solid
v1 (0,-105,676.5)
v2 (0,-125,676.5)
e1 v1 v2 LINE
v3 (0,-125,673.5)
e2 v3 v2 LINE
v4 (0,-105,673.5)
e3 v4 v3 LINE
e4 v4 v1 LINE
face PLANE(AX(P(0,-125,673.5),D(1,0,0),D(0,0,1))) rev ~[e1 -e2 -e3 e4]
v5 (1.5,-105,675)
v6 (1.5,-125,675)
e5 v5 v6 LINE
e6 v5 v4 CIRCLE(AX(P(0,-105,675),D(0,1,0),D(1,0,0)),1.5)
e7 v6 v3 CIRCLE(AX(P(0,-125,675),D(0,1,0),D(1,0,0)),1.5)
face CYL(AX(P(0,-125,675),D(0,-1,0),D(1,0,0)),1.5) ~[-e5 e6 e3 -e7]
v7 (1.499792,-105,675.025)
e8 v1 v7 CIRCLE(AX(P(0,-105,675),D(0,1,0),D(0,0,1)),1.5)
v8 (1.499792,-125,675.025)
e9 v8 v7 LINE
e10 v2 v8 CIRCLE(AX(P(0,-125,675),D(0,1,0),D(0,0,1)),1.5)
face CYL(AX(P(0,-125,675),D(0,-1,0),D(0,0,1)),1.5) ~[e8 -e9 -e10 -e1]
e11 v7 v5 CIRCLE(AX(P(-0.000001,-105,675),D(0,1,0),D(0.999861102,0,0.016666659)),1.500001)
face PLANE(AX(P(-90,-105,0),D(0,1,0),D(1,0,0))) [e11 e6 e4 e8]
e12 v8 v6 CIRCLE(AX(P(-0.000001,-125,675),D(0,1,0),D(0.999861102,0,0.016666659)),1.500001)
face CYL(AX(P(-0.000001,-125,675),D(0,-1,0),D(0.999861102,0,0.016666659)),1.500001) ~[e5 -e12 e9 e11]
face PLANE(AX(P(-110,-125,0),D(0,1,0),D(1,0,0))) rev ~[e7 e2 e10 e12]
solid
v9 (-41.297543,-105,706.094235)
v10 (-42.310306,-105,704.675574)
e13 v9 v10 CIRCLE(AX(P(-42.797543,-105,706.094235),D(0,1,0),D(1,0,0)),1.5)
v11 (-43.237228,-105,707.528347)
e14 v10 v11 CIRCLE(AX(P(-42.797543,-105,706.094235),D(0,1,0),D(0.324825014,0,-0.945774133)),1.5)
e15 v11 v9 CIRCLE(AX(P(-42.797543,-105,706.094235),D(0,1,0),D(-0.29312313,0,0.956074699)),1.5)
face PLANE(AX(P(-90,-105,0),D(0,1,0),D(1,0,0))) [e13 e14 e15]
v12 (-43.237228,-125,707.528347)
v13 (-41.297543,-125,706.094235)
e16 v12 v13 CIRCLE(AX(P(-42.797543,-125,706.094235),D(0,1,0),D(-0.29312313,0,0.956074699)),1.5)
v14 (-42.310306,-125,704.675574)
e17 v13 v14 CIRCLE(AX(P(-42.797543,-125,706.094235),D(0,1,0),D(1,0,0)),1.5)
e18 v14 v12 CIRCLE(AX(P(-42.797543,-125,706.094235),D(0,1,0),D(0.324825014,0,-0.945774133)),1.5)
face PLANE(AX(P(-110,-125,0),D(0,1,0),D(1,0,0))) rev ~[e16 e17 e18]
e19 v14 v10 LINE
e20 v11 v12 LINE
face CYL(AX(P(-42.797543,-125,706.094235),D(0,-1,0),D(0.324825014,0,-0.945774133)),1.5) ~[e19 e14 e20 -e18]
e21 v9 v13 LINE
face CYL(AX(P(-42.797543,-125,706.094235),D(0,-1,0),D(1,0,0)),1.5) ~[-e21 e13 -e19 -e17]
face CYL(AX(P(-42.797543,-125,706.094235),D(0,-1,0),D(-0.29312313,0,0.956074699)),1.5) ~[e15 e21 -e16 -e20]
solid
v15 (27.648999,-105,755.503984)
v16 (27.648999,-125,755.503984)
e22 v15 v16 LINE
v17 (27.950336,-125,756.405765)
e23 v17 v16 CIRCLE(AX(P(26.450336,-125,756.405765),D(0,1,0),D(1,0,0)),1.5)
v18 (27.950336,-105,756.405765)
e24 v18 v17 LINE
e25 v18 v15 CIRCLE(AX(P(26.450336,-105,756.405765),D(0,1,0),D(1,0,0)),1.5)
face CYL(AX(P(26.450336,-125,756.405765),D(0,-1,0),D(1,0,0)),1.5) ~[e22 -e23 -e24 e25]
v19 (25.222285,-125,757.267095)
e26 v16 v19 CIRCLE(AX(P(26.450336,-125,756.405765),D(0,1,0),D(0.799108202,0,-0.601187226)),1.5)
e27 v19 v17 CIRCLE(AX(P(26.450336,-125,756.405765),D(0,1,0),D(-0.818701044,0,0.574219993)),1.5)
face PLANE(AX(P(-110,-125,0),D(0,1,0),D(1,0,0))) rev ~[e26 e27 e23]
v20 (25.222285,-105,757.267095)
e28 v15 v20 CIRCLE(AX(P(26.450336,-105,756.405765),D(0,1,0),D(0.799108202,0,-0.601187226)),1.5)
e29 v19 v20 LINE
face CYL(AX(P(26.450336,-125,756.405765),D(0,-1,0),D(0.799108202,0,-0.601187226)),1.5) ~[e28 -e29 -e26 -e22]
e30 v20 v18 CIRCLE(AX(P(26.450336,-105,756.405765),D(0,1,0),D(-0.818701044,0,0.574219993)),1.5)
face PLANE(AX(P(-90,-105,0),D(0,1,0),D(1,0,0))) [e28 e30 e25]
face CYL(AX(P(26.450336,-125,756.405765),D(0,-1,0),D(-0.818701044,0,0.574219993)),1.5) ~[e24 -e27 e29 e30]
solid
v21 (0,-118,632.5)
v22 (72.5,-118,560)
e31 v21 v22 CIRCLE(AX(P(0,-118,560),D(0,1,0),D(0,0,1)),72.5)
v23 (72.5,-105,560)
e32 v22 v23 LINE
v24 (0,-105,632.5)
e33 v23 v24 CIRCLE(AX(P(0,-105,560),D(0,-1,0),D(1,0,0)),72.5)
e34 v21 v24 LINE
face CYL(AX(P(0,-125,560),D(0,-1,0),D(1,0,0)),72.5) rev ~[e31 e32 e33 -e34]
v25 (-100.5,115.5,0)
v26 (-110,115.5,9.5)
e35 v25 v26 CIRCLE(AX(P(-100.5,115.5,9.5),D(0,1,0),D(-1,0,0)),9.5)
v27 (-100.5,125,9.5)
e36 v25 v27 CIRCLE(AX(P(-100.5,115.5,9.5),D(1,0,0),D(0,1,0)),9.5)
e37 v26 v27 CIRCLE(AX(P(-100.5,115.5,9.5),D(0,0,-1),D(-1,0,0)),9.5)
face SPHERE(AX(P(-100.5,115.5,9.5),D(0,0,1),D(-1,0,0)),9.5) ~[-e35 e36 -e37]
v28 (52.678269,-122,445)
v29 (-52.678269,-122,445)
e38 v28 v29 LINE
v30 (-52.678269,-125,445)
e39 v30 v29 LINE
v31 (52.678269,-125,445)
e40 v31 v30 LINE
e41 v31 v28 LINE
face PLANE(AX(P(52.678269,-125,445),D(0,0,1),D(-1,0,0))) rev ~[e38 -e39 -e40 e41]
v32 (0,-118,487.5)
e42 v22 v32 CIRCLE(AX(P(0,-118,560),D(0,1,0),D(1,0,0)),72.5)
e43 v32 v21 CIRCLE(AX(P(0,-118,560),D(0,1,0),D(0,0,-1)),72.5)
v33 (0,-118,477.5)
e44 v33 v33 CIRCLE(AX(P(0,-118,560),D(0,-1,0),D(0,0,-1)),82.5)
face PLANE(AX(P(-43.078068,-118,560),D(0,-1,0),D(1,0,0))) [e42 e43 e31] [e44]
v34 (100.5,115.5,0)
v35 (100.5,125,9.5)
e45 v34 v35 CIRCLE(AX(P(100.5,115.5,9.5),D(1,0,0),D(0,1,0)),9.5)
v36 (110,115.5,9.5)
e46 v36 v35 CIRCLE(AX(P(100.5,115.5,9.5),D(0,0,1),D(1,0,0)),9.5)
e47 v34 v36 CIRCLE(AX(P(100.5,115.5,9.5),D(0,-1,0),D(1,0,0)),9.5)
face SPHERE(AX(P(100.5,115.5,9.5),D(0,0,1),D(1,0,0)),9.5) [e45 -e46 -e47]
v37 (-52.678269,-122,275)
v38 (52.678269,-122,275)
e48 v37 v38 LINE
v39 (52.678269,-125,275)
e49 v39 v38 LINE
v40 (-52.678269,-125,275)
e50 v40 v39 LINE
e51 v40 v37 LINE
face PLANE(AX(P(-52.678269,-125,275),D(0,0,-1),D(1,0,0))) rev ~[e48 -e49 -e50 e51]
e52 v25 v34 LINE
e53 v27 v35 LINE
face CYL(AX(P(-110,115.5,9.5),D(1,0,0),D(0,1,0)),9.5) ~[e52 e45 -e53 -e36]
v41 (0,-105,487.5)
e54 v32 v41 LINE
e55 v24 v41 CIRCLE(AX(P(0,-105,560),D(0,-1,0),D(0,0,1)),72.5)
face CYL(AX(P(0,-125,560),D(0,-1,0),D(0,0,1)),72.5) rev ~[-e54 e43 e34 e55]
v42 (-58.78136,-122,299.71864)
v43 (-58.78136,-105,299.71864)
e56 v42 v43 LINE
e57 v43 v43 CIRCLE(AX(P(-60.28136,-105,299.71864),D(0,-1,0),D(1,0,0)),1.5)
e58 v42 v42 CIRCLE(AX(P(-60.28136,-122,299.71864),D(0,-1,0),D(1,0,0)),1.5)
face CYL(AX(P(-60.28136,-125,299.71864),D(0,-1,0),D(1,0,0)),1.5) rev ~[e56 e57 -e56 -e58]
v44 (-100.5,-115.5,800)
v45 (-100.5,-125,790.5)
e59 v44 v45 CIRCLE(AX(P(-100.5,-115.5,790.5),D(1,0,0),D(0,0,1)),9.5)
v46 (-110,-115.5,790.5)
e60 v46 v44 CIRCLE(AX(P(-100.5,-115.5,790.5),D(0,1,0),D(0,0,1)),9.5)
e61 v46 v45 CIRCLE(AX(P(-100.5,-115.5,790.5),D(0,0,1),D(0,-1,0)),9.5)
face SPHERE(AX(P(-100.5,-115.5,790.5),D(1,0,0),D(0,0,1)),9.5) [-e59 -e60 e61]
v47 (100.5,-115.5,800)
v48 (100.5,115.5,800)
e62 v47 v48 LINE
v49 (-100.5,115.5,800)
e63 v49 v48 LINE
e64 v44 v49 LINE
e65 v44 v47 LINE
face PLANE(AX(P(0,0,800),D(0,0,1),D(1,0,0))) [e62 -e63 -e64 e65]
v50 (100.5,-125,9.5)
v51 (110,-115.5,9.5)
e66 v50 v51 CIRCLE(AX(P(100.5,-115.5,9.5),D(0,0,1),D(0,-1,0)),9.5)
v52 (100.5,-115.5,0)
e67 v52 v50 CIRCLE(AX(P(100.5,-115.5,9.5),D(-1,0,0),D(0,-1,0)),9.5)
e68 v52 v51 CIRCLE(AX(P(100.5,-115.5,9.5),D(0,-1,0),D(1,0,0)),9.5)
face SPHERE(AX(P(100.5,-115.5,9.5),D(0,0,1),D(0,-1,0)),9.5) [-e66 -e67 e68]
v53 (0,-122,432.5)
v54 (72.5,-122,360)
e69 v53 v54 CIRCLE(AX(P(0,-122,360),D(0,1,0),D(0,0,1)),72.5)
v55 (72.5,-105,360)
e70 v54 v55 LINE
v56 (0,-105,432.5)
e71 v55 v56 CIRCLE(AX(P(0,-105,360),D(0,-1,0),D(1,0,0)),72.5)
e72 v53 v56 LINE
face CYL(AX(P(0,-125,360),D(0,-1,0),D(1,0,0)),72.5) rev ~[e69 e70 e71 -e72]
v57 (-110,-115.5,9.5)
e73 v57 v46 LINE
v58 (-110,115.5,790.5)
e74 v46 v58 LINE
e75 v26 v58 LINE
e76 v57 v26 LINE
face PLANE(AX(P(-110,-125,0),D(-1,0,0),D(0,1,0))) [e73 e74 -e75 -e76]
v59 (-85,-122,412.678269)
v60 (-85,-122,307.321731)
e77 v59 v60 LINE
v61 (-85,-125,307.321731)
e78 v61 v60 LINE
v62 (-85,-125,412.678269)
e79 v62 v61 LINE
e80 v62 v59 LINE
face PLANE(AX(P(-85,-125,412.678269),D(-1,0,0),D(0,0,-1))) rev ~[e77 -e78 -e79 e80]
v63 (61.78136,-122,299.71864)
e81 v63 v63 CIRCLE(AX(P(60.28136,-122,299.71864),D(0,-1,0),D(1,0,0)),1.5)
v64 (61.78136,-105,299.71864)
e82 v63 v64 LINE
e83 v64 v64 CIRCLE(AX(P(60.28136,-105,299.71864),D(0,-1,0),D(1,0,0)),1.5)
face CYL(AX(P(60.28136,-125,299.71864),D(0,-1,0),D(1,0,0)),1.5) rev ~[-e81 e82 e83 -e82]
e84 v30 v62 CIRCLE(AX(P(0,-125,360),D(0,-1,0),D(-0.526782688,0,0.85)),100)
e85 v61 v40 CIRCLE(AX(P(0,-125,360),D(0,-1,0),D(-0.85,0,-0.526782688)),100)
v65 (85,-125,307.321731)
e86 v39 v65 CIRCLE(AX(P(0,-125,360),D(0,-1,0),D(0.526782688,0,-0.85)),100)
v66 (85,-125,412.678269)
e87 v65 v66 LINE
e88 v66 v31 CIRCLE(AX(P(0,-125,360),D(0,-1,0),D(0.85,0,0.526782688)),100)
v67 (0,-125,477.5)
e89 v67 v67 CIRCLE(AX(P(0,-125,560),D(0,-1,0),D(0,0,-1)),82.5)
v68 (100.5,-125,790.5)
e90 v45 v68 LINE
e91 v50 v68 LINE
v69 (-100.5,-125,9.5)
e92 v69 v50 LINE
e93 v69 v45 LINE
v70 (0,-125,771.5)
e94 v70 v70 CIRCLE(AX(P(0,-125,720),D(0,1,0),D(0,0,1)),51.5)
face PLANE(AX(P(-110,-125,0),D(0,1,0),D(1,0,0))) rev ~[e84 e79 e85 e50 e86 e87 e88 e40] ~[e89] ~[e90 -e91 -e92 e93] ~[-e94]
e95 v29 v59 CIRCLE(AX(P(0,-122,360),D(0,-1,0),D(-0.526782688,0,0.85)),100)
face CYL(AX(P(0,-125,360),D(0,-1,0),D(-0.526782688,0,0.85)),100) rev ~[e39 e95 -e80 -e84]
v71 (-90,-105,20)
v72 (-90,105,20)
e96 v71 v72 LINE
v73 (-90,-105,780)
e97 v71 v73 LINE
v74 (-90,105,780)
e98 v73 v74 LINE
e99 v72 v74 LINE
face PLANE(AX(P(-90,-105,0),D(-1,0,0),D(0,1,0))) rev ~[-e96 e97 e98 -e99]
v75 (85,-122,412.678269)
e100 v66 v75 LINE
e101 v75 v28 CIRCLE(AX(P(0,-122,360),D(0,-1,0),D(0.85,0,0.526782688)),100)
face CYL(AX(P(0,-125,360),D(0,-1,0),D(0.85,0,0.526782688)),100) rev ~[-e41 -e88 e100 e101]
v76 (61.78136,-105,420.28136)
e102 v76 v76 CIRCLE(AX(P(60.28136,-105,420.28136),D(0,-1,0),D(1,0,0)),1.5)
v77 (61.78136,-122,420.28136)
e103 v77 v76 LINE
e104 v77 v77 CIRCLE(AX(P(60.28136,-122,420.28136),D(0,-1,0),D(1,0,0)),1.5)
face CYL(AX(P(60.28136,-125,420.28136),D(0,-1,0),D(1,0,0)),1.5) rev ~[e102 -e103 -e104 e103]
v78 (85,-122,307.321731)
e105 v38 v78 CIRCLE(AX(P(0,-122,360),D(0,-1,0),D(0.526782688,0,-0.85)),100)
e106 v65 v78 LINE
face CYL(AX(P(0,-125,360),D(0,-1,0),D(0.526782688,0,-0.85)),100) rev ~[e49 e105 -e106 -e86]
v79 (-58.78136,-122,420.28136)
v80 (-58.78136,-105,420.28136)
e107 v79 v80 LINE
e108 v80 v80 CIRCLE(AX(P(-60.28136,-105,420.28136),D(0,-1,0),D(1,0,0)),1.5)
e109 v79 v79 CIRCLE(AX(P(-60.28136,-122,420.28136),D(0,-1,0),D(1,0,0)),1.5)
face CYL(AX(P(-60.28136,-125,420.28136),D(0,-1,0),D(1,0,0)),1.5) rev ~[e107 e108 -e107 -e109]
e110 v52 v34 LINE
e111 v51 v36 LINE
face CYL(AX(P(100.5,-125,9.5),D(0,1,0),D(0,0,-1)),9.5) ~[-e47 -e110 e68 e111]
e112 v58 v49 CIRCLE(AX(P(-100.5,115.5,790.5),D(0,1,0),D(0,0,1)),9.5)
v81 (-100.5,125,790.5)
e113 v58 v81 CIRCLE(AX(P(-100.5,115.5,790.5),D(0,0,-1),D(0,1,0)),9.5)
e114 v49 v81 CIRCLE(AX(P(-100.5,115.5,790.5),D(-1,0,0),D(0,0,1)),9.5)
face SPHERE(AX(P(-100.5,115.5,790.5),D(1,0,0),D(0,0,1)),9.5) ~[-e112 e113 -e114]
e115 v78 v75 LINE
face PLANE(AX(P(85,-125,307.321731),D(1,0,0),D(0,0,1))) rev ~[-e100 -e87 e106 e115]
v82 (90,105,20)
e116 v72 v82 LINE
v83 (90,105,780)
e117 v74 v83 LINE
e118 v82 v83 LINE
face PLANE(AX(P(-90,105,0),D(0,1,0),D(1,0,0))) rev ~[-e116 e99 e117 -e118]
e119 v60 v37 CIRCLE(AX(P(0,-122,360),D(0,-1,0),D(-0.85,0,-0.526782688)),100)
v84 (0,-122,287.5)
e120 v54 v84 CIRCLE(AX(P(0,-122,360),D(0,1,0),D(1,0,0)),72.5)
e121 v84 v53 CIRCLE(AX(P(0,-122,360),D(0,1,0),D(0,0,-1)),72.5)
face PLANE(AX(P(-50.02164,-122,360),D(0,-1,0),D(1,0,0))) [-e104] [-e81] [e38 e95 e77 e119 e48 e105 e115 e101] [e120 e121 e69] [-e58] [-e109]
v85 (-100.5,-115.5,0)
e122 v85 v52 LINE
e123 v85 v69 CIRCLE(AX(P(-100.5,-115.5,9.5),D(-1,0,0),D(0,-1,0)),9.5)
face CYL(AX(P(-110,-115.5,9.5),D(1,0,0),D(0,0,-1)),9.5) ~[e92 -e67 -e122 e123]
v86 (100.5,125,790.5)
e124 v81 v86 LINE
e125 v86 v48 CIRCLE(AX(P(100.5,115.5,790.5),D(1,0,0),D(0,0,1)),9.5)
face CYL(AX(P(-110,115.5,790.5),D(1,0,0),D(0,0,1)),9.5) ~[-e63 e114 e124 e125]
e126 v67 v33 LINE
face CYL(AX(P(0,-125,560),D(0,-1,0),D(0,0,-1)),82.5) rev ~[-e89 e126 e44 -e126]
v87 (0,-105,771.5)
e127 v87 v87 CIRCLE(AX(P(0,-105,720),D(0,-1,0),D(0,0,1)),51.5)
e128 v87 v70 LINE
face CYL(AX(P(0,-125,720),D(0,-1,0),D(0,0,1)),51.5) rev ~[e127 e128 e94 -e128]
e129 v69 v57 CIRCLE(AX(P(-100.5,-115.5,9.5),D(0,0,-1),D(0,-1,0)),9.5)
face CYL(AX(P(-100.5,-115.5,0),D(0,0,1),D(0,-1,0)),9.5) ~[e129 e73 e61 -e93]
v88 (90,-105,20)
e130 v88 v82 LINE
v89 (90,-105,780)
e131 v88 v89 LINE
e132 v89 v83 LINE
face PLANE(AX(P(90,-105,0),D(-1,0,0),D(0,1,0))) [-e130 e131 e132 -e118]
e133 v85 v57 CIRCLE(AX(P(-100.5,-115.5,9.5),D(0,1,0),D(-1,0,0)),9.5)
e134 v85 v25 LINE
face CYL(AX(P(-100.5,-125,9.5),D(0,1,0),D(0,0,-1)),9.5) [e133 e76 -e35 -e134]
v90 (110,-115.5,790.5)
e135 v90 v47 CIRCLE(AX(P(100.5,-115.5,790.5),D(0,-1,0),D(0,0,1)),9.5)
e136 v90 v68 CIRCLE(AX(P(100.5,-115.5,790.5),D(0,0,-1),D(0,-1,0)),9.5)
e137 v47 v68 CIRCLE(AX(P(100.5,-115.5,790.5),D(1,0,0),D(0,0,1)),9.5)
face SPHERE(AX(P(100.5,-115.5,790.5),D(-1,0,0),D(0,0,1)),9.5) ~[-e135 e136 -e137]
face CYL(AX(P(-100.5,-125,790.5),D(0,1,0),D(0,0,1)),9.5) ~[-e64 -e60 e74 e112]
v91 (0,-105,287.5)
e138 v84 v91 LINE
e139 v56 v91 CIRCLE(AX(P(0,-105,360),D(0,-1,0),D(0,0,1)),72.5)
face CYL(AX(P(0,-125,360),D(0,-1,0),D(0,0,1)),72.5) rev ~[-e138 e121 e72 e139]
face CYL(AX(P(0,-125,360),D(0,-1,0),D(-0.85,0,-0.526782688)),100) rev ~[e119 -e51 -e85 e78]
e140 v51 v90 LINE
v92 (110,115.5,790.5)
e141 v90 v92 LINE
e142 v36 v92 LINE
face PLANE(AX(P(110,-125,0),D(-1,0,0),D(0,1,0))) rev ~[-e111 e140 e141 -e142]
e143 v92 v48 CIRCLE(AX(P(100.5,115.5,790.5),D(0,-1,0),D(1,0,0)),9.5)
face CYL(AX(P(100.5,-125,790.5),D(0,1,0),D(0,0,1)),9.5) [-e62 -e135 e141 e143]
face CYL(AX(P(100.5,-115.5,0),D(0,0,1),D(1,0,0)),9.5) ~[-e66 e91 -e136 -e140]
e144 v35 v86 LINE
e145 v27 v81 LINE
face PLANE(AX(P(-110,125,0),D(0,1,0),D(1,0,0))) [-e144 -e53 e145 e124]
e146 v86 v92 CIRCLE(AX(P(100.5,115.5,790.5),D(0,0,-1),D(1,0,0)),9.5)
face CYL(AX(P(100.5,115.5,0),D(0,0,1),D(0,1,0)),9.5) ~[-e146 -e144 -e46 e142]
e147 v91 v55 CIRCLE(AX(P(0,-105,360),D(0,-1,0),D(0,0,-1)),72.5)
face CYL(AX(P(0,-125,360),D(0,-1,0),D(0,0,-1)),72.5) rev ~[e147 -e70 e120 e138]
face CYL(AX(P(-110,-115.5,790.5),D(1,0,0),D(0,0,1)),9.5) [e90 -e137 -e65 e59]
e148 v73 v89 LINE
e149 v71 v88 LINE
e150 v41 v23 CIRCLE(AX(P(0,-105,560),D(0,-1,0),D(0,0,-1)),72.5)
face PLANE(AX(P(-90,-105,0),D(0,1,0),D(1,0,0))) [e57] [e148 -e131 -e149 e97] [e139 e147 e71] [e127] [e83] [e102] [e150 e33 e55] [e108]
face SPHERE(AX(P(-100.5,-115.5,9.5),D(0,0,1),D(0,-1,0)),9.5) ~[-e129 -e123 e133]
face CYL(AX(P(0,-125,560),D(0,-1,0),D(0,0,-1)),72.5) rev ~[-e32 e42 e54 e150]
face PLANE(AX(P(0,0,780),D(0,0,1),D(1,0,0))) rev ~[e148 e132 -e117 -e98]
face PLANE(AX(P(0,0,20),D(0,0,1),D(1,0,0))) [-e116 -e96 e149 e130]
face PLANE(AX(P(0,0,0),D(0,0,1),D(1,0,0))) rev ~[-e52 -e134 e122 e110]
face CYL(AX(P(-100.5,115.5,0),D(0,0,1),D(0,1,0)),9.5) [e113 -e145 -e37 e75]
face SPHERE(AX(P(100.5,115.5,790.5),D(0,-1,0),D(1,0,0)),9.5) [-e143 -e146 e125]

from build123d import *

# Parameters (mm, degrees)
F0_W     = 180
F0_H     = 210
F1_DEPTH = 20
F0_W_2   = 220
F0_H_2   = 250
F2_DEPTH = 800
F3_W     = 180
F3_H     = 210
F4_DEPTH = 20
F5_R     = 1.5
F6_DEPTH = 20
F7_DEPTH = 7
F8_DEPTH = 3
F9_R     = 9.5


with BuildPart() as f1:
    # F0 (on Top) → F1 (new body)
    with BuildSketch(Plane.XY):
        Rectangle(F0_W, F0_H)
    extrude(amount=F1_DEPTH)

    # F0 (on Top) → F2 (join)
    with BuildSketch(Plane.XY):
        Rectangle(F0_W_2, F0_H_2)
        Rectangle(F0_W, F0_H, mode=Mode.SUBTRACT)
    extrude(amount=F2_DEPTH)

    # F3 (on face) → F4 (join)
    with BuildSketch(Plane.XY.offset(800)):
        Rectangle(F3_W, F3_H)
    extrude(amount=-F4_DEPTH)

    # F5 (on face) → F6 (cut)
    with BuildSketch(Plane.XZ.offset(125)):
        with BuildLine():
            ThreePointArc((51.5, 720), (36.4159992311, 756.4159992311), (0, 771.5))
            Line((0, 771.5), (0, 765))
            ThreePointArc((0, 765), (13.1905408693, 763.023361463), (25.2222847872, 757.2670947367))
            ThreePointArc((25.2222847872, 757.2670947367), (26.9019571294, 757.8361628294), (27.9503363532, 756.4057647469))
            ThreePointArc((27.9503363532, 756.4057647469), (27.8730087425, 755.9303667321), (27.6489986565, 755.5039839073))
            ThreePointArc((27.6489986565, 755.5039839073), (40.4302172857, 739.7584799574), (45, 720))
            ThreePointArc((45, 720), (44.5571276947, 713.7021931119), (43.2372279289, 707.5283473019))
            ThreePointArc((43.2372279289, 707.5283473019), (44.0036790141, 706.9859955787), (44.2975432333, 706.0942352531))
            ThreePointArc((44.2975432333, 706.0942352531), (43.6690774316, 704.8734043307), (42.3103057118, 704.6755740541))
            ThreePointArc((42.3103057118, 704.6755740541), (26.4503363532, 683.5942352531), (1.4997916522, 675.025))
            ThreePointArc((1.4997916522, 675.025), (1.4999479121, 675.0125004341), (1.5, 675))
            ThreePointArc((1.5, 675), (1.0606601718, 673.9393398282), (0, 673.5))
            Line((0, 673.5), (0, 668.5))
            ThreePointArc((0, 668.5), (36.4159992311, 683.5840007689), (51.5, 720))
        make_face()
        with BuildLine():
            Line((0, 765), (0, 771.5))
            ThreePointArc((0, 771.5), (-51.5, 720), (0, 668.5))
            Line((0, 668.5), (0, 673.5))
            ThreePointArc((0, 673.5), (-1.0694624818, 673.9482158016), (-1.4997916522, 675.025))
            ThreePointArc((-1.4997916522, 675.025), (-26.4503363532, 683.5942352531), (-42.3103057118, 704.6755740541))
            ThreePointArc((-42.3103057118, 704.6755740541), (-44.2241280077, 705.6307097616), (-43.2372279289, 707.5283473019))
            ThreePointArc((-43.2372279289, 707.5283473019), (-42.7975432333, 733.9057647469), (-27.6489986565, 755.5039839073))
            ThreePointArc((-27.6489986565, 755.5039839073), (-27.3320142316, 757.6192902384), (-25.2222847872, 757.2670947367))
            ThreePointArc((-25.2222847872, 757.2670947367), (-13.1905408693, 763.023361463), (0, 765))
        make_face()
        with BuildLine():
            ThreePointArc((25.2222847872, 757.2670947367), (13.1905408693, 763.023361463), (0, 765))
            Line((0, 765), (0, 760))
            ThreePointArc((0, 760), (28.2842712475, 748.2842712475), (40, 720))
            ThreePointArc((40, 720), (28.2842712475, 691.7157287525), (0, 680))
            Line((0, 680), (0, 676.5))
            ThreePointArc((0, 676.5), (1.0517841984, 676.0694624818), (1.4997916522, 675.025))
            ThreePointArc((1.4997916522, 675.025), (26.4503363532, 683.5942352531), (42.3103057118, 704.6755740541))
            ThreePointArc((42.3103057118, 704.6755740541), (41.3709584588, 706.5577607447), (43.2372279289, 707.5283473019))
            ThreePointArc((43.2372279289, 707.5283473019), (44.5571276947, 713.7021931119), (45, 720))
            ThreePointArc((45, 720), (40.4302172857, 739.7584799574), (27.6489986565, 755.5039839073))
            ThreePointArc((27.6489986565, 755.5039839073), (25.5686584747, 755.1922392553), (25.2222847872, 757.2670947367))
        make_face()
        with BuildLine():
            Line((0, 760), (0, 765))
            ThreePointArc((0, 765), (-13.1905408693, 763.023361463), (-25.2222847872, 757.2670947367))
            ThreePointArc((-25.2222847872, 757.2670947367), (-25.0199382706, 756.8573855231), (-24.9503363532, 756.4057647469))
            ThreePointArc((-24.9503363532, 756.4057647469), (-25.9749383383, 754.9830923575), (-27.6489986565, 755.5039839073))
            ThreePointArc((-27.6489986565, 755.5039839073), (-42.7975432333, 733.9057647469), (-43.2372279289, 707.5283473019))
            ThreePointArc((-43.2372279289, 707.5283473019), (-41.9057829077, 707.3003710339), (-41.2975432333, 706.0942352531))
            ThreePointArc((-41.2975432333, 706.0942352531), (-41.5767123109, 705.2227010548), (-42.3103057118, 704.6755740541))
            ThreePointArc((-42.3103057118, 704.6755740541), (-26.4503363532, 683.5942352531), (-1.4997916522, 675.025))
            ThreePointArc((-1.4997916522, 675.025), (-1.0517841984, 676.0694624818), (0, 676.5))
            Line((0, 676.5), (0, 680))
            ThreePointArc((0, 680), (-40, 720), (0, 760))
        make_face()
        with BuildLine():
            ThreePointArc((40, 720), (28.2842712475, 748.2842712475), (0, 760))
            Line((0, 760), (0, 680))
            ThreePointArc((0, 680), (28.2842712475, 691.7157287525), (40, 720))
        make_face()
        with BuildLine():
            Line((0, 680), (0, 760))
            ThreePointArc((0, 760), (-40, 720), (0, 680))
        make_face()
        with BuildLine():
            ThreePointArc((-24.9503363532, 756.4057647469), (-25.0199382706, 756.8573855231), (-25.2222847872, 757.2670947367))
            ThreePointArc((-25.2222847872, 757.2670947367), (-26.4503363532, 756.4057647469), (-27.6489986565, 755.5039839073))
            ThreePointArc((-27.6489986565, 755.5039839073), (-25.9749383383, 754.9830923575), (-24.9503363532, 756.4057647469))
        make_face()
        with BuildLine():
            ThreePointArc((-27.6489986565, 755.5039839073), (-26.4503363532, 756.4057647469), (-25.2222847872, 757.2670947367))
            ThreePointArc((-25.2222847872, 757.2670947367), (-27.3320142316, 757.6192902384), (-27.6489986565, 755.5039839073))
        make_face()
        with BuildLine():
            ThreePointArc((-1.4997916522, 675.025), (-1.0694624818, 673.9482158016), (0, 673.5))
            Line((0, 673.5), (0, 675))
            ThreePointArc((0, 675), (-0.75, 675.0062504341), (-1.4997916522, 675.025))
        make_face()
        with BuildLine():
            ThreePointArc((-1.4997916522, 675.025), (-0.75, 675.0062504341), (0, 675))
            Line((0, 675), (0, 676.5))
            ThreePointArc((0, 676.5), (-1.0517841984, 676.0694624818), (-1.4997916522, 675.025))
        make_face()
        with BuildLine():
            ThreePointArc((72.5, 560), (51.265241636, 611.265241636), (0, 632.5))
            Line((0, 632.5), (0, 487.5))
            ThreePointArc((0, 487.5), (51.265241636, 508.734758364), (72.5, 560))
        make_face()
        with BuildLine():
            Line((0, 487.5), (0, 632.5))
            ThreePointArc((0, 632.5), (-72.5, 560), (0, 487.5))
        make_face()
        with BuildLine():
            ThreePointArc((44.2975432333, 706.0942352531), (44.0036790141, 706.9859955787), (43.2372279289, 707.5283473019))
            ThreePointArc((43.2372279289, 707.5283473019), (42.7975432333, 706.0942352531), (42.3103057118, 704.6755740541))
            ThreePointArc((42.3103057118, 704.6755740541), (43.6690774316, 704.8734043307), (44.2975432333, 706.0942352531))
        make_face()
        with BuildLine():
            ThreePointArc((42.3103057118, 704.6755740541), (42.7975432333, 706.0942352531), (43.2372279289, 707.5283473019))
            ThreePointArc((43.2372279289, 707.5283473019), (41.3709584588, 706.5577607447), (42.3103057118, 704.6755740541))
        make_face()
        with BuildLine():
            ThreePointArc((0, 432.5), (-72.5, 360), (0, 287.5))
            Line((0, 287.5), (0, 432.5))
        make_face()
        with BuildLine():
            Line((0, 432.5), (0, 287.5))
            ThreePointArc((0, 287.5), (51.265241636, 308.734758364), (72.5, 360))
            ThreePointArc((72.5, 360), (51.265241636, 411.265241636), (0, 432.5))
        make_face()
        with Locations((-60.2813602239, 420.2813602239)):
            Circle(F5_R)
        with Locations((-60.2813602239, 299.7186397761)):
            Circle(F5_R)
        with Locations((60.2813602239, 299.7186397761)):
            Circle(F5_R)
        with Locations((60.2813602239, 420.2813602239)):
            Circle(F5_R)
    extrude(amount=-F6_DEPTH, mode=Mode.SUBTRACT)

    # F5 (on face) → F7 (cut)
    with BuildSketch(Plane.XZ.offset(125)):
        with BuildLine():
            Line((0, 632.5), (0, 642.5))
            ThreePointArc((0, 642.5), (-82.5, 560), (0, 477.5))
            Line((0, 477.5), (0, 487.5))
            ThreePointArc((0, 487.5), (-72.5, 560), (0, 632.5))
        make_face()
        with BuildLine():
            ThreePointArc((82.5, 560), (58.3363094479, 618.3363094479), (0, 642.5))
            Line((0, 642.5), (0, 632.5))
            ThreePointArc((0, 632.5), (51.265241636, 611.265241636), (72.5, 560))
            ThreePointArc((72.5, 560), (51.265241636, 508.734758364), (0, 487.5))
            Line((0, 487.5), (0, 477.5))
            ThreePointArc((0, 477.5), (58.3363094479, 501.6636905521), (82.5, 560))
        make_face()
    extrude(amount=-F7_DEPTH, mode=Mode.SUBTRACT)

    # F5 (on face) → F8 (cut)
    with BuildSketch(Plane.XZ.offset(125)):
        with BuildLine():
            Line((-52.6782687643, 275), (0, 275))
            Line((0, 275), (0, 287.5))
            ThreePointArc((0, 287.5), (-72.5, 360), (0, 432.5))
            Line((0, 432.5), (0, 445))
            Line((0, 445), (-52.6782687643, 445))
            ThreePointArc((-52.6782687643, 445), (-70.7106781187, 430.7106781187), (-85, 412.6782687643))
            Line((-85, 412.6782687643), (-85, 307.3217312357))
            ThreePointArc((-85, 307.3217312357), (-70.7106781187, 289.2893218813), (-52.6782687643, 275))
        make_face()
        with Locations((-60.2813602239, 299.7186397761)):
            Circle(F5_R, mode=Mode.SUBTRACT)
        with Locations((-60.2813602239, 420.2813602239)):
            Circle(F5_R, mode=Mode.SUBTRACT)
        with BuildLine():
            Line((0, 287.5), (0, 275))
            Line((0, 275), (52.6782687643, 275))
            ThreePointArc((52.6782687643, 275), (70.7106781187, 289.2893218813), (85, 307.3217312357))
            Line((85, 307.3217312357), (85, 412.6782687643))
            ThreePointArc((85, 412.6782687643), (70.7106781187, 430.7106781187), (52.6782687643, 445))
            Line((52.6782687643, 445), (0, 445))
            Line((0, 445), (0, 432.5))
            ThreePointArc((0, 432.5), (51.265241636, 411.265241636), (72.5, 360))
            ThreePointArc((72.5, 360), (51.265241636, 308.734758364), (0, 287.5))
        make_face()
        with Locations((60.2813602239, 299.7186397761)):
            Circle(F5_R, mode=Mode.SUBTRACT)
        with Locations((60.2813602239, 420.2813602239)):
            Circle(F5_R, mode=Mode.SUBTRACT)
        with BuildLine():
            Line((0, 765), (0, 771.5))
            ThreePointArc((0, 771.5), (-51.5, 720), (0, 668.5))
            Line((0, 668.5), (0, 673.5))
            ThreePointArc((0, 673.5), (-1.0694624818, 673.9482158016), (-1.4997916522, 675.025))
            ThreePointArc((-1.4997916522, 675.025), (-26.4503363532, 683.5942352531), (-42.3103057118, 704.6755740541))
            ThreePointArc((-42.3103057118, 704.6755740541), (-44.2241280077, 705.6307097616), (-43.2372279289, 707.5283473019))
            ThreePointArc((-43.2372279289, 707.5283473019), (-42.7975432333, 733.9057647469), (-27.6489986565, 755.5039839073))
            ThreePointArc((-27.6489986565, 755.5039839073), (-27.3320142316, 757.6192902384), (-25.2222847872, 757.2670947367))
            ThreePointArc((-25.2222847872, 757.2670947367), (-13.1905408693, 763.023361463), (0, 765))
        make_face()
        with BuildLine():
            ThreePointArc((51.5, 720), (36.4159992311, 756.4159992311), (0, 771.5))
            Line((0, 771.5), (0, 765))
            ThreePointArc((0, 765), (13.1905408693, 763.023361463), (25.2222847872, 757.2670947367))
            ThreePointArc((25.2222847872, 757.2670947367), (26.9019571294, 757.8361628294), (27.9503363532, 756.4057647469))
            ThreePointArc((27.9503363532, 756.4057647469), (27.8730087425, 755.9303667321), (27.6489986565, 755.5039839073))
            ThreePointArc((27.6489986565, 755.5039839073), (40.4302172857, 739.7584799574), (45, 720))
            ThreePointArc((45, 720), (44.5571276947, 713.7021931119), (43.2372279289, 707.5283473019))
            ThreePointArc((43.2372279289, 707.5283473019), (44.0036790141, 706.9859955787), (44.2975432333, 706.0942352531))
            ThreePointArc((44.2975432333, 706.0942352531), (43.6690774316, 704.8734043307), (42.3103057118, 704.6755740541))
            ThreePointArc((42.3103057118, 704.6755740541), (26.4503363532, 683.5942352531), (1.4997916522, 675.025))
            ThreePointArc((1.4997916522, 675.025), (1.4999479121, 675.0125004341), (1.5, 675))
            ThreePointArc((1.5, 675), (1.0606601718, 673.9393398282), (0, 673.5))
            Line((0, 673.5), (0, 668.5))
            ThreePointArc((0, 668.5), (36.4159992311, 683.5840007689), (51.5, 720))
        make_face()
        with BuildLine():
            Line((0, 760), (0, 765))
            ThreePointArc((0, 765), (-13.1905408693, 763.023361463), (-25.2222847872, 757.2670947367))
            ThreePointArc((-25.2222847872, 757.2670947367), (-25.0199382706, 756.8573855231), (-24.9503363532, 756.4057647469))
            ThreePointArc((-24.9503363532, 756.4057647469), (-25.9749383383, 754.9830923575), (-27.6489986565, 755.5039839073))
            ThreePointArc((-27.6489986565, 755.5039839073), (-42.7975432333, 733.9057647469), (-43.2372279289, 707.5283473019))
            ThreePointArc((-43.2372279289, 707.5283473019), (-41.9057829077, 707.3003710339), (-41.2975432333, 706.0942352531))
            ThreePointArc((-41.2975432333, 706.0942352531), (-41.5767123109, 705.2227010548), (-42.3103057118, 704.6755740541))
            ThreePointArc((-42.3103057118, 704.6755740541), (-26.4503363532, 683.5942352531), (-1.4997916522, 675.025))
            ThreePointArc((-1.4997916522, 675.025), (-1.0517841984, 676.0694624818), (0, 676.5))
            Line((0, 676.5), (0, 680))
            ThreePointArc((0, 680), (-40, 720), (0, 760))
        make_face()
        with BuildLine():
            ThreePointArc((25.2222847872, 757.2670947367), (13.1905408693, 763.023361463), (0, 765))
            Line((0, 765), (0, 760))
            ThreePointArc((0, 760), (28.2842712475, 748.2842712475), (40, 720))
            ThreePointArc((40, 720), (28.2842712475, 691.7157287525), (0, 680))
            Line((0, 680), (0, 676.5))
            ThreePointArc((0, 676.5), (1.0517841984, 676.0694624818), (1.4997916522, 675.025))
            ThreePointArc((1.4997916522, 675.025), (26.4503363532, 683.5942352531), (42.3103057118, 704.6755740541))
            ThreePointArc((42.3103057118, 704.6755740541), (41.3709584588, 706.5577607447), (43.2372279289, 707.5283473019))
            ThreePointArc((43.2372279289, 707.5283473019), (44.5571276947, 713.7021931119), (45, 720))
            ThreePointArc((45, 720), (40.4302172857, 739.7584799574), (27.6489986565, 755.5039839073))
            ThreePointArc((27.6489986565, 755.5039839073), (25.5686584747, 755.1922392553), (25.2222847872, 757.2670947367))
        make_face()
    extrude(amount=-F8_DEPTH, mode=Mode.SUBTRACT)

    # F9
    f9_edges = [f1.edges().sort_by_distance(p)[0] for p in [
        (0, -125, 800),
        (110, 0, 800),
        (110, -125, 400),
        (110, 125, 400),
        (0, 125, 800),
        (-110, 0, 800),
        (-110, -125, 400),
        (0, -125, 0),
        (-110, 125, 400),
        (-110, 0, 0),
        (110, 0, 0),
        (0, 125, 0),
    ]]
    fillet(f9_edges, radius=F9_R)


solid = f1.part
